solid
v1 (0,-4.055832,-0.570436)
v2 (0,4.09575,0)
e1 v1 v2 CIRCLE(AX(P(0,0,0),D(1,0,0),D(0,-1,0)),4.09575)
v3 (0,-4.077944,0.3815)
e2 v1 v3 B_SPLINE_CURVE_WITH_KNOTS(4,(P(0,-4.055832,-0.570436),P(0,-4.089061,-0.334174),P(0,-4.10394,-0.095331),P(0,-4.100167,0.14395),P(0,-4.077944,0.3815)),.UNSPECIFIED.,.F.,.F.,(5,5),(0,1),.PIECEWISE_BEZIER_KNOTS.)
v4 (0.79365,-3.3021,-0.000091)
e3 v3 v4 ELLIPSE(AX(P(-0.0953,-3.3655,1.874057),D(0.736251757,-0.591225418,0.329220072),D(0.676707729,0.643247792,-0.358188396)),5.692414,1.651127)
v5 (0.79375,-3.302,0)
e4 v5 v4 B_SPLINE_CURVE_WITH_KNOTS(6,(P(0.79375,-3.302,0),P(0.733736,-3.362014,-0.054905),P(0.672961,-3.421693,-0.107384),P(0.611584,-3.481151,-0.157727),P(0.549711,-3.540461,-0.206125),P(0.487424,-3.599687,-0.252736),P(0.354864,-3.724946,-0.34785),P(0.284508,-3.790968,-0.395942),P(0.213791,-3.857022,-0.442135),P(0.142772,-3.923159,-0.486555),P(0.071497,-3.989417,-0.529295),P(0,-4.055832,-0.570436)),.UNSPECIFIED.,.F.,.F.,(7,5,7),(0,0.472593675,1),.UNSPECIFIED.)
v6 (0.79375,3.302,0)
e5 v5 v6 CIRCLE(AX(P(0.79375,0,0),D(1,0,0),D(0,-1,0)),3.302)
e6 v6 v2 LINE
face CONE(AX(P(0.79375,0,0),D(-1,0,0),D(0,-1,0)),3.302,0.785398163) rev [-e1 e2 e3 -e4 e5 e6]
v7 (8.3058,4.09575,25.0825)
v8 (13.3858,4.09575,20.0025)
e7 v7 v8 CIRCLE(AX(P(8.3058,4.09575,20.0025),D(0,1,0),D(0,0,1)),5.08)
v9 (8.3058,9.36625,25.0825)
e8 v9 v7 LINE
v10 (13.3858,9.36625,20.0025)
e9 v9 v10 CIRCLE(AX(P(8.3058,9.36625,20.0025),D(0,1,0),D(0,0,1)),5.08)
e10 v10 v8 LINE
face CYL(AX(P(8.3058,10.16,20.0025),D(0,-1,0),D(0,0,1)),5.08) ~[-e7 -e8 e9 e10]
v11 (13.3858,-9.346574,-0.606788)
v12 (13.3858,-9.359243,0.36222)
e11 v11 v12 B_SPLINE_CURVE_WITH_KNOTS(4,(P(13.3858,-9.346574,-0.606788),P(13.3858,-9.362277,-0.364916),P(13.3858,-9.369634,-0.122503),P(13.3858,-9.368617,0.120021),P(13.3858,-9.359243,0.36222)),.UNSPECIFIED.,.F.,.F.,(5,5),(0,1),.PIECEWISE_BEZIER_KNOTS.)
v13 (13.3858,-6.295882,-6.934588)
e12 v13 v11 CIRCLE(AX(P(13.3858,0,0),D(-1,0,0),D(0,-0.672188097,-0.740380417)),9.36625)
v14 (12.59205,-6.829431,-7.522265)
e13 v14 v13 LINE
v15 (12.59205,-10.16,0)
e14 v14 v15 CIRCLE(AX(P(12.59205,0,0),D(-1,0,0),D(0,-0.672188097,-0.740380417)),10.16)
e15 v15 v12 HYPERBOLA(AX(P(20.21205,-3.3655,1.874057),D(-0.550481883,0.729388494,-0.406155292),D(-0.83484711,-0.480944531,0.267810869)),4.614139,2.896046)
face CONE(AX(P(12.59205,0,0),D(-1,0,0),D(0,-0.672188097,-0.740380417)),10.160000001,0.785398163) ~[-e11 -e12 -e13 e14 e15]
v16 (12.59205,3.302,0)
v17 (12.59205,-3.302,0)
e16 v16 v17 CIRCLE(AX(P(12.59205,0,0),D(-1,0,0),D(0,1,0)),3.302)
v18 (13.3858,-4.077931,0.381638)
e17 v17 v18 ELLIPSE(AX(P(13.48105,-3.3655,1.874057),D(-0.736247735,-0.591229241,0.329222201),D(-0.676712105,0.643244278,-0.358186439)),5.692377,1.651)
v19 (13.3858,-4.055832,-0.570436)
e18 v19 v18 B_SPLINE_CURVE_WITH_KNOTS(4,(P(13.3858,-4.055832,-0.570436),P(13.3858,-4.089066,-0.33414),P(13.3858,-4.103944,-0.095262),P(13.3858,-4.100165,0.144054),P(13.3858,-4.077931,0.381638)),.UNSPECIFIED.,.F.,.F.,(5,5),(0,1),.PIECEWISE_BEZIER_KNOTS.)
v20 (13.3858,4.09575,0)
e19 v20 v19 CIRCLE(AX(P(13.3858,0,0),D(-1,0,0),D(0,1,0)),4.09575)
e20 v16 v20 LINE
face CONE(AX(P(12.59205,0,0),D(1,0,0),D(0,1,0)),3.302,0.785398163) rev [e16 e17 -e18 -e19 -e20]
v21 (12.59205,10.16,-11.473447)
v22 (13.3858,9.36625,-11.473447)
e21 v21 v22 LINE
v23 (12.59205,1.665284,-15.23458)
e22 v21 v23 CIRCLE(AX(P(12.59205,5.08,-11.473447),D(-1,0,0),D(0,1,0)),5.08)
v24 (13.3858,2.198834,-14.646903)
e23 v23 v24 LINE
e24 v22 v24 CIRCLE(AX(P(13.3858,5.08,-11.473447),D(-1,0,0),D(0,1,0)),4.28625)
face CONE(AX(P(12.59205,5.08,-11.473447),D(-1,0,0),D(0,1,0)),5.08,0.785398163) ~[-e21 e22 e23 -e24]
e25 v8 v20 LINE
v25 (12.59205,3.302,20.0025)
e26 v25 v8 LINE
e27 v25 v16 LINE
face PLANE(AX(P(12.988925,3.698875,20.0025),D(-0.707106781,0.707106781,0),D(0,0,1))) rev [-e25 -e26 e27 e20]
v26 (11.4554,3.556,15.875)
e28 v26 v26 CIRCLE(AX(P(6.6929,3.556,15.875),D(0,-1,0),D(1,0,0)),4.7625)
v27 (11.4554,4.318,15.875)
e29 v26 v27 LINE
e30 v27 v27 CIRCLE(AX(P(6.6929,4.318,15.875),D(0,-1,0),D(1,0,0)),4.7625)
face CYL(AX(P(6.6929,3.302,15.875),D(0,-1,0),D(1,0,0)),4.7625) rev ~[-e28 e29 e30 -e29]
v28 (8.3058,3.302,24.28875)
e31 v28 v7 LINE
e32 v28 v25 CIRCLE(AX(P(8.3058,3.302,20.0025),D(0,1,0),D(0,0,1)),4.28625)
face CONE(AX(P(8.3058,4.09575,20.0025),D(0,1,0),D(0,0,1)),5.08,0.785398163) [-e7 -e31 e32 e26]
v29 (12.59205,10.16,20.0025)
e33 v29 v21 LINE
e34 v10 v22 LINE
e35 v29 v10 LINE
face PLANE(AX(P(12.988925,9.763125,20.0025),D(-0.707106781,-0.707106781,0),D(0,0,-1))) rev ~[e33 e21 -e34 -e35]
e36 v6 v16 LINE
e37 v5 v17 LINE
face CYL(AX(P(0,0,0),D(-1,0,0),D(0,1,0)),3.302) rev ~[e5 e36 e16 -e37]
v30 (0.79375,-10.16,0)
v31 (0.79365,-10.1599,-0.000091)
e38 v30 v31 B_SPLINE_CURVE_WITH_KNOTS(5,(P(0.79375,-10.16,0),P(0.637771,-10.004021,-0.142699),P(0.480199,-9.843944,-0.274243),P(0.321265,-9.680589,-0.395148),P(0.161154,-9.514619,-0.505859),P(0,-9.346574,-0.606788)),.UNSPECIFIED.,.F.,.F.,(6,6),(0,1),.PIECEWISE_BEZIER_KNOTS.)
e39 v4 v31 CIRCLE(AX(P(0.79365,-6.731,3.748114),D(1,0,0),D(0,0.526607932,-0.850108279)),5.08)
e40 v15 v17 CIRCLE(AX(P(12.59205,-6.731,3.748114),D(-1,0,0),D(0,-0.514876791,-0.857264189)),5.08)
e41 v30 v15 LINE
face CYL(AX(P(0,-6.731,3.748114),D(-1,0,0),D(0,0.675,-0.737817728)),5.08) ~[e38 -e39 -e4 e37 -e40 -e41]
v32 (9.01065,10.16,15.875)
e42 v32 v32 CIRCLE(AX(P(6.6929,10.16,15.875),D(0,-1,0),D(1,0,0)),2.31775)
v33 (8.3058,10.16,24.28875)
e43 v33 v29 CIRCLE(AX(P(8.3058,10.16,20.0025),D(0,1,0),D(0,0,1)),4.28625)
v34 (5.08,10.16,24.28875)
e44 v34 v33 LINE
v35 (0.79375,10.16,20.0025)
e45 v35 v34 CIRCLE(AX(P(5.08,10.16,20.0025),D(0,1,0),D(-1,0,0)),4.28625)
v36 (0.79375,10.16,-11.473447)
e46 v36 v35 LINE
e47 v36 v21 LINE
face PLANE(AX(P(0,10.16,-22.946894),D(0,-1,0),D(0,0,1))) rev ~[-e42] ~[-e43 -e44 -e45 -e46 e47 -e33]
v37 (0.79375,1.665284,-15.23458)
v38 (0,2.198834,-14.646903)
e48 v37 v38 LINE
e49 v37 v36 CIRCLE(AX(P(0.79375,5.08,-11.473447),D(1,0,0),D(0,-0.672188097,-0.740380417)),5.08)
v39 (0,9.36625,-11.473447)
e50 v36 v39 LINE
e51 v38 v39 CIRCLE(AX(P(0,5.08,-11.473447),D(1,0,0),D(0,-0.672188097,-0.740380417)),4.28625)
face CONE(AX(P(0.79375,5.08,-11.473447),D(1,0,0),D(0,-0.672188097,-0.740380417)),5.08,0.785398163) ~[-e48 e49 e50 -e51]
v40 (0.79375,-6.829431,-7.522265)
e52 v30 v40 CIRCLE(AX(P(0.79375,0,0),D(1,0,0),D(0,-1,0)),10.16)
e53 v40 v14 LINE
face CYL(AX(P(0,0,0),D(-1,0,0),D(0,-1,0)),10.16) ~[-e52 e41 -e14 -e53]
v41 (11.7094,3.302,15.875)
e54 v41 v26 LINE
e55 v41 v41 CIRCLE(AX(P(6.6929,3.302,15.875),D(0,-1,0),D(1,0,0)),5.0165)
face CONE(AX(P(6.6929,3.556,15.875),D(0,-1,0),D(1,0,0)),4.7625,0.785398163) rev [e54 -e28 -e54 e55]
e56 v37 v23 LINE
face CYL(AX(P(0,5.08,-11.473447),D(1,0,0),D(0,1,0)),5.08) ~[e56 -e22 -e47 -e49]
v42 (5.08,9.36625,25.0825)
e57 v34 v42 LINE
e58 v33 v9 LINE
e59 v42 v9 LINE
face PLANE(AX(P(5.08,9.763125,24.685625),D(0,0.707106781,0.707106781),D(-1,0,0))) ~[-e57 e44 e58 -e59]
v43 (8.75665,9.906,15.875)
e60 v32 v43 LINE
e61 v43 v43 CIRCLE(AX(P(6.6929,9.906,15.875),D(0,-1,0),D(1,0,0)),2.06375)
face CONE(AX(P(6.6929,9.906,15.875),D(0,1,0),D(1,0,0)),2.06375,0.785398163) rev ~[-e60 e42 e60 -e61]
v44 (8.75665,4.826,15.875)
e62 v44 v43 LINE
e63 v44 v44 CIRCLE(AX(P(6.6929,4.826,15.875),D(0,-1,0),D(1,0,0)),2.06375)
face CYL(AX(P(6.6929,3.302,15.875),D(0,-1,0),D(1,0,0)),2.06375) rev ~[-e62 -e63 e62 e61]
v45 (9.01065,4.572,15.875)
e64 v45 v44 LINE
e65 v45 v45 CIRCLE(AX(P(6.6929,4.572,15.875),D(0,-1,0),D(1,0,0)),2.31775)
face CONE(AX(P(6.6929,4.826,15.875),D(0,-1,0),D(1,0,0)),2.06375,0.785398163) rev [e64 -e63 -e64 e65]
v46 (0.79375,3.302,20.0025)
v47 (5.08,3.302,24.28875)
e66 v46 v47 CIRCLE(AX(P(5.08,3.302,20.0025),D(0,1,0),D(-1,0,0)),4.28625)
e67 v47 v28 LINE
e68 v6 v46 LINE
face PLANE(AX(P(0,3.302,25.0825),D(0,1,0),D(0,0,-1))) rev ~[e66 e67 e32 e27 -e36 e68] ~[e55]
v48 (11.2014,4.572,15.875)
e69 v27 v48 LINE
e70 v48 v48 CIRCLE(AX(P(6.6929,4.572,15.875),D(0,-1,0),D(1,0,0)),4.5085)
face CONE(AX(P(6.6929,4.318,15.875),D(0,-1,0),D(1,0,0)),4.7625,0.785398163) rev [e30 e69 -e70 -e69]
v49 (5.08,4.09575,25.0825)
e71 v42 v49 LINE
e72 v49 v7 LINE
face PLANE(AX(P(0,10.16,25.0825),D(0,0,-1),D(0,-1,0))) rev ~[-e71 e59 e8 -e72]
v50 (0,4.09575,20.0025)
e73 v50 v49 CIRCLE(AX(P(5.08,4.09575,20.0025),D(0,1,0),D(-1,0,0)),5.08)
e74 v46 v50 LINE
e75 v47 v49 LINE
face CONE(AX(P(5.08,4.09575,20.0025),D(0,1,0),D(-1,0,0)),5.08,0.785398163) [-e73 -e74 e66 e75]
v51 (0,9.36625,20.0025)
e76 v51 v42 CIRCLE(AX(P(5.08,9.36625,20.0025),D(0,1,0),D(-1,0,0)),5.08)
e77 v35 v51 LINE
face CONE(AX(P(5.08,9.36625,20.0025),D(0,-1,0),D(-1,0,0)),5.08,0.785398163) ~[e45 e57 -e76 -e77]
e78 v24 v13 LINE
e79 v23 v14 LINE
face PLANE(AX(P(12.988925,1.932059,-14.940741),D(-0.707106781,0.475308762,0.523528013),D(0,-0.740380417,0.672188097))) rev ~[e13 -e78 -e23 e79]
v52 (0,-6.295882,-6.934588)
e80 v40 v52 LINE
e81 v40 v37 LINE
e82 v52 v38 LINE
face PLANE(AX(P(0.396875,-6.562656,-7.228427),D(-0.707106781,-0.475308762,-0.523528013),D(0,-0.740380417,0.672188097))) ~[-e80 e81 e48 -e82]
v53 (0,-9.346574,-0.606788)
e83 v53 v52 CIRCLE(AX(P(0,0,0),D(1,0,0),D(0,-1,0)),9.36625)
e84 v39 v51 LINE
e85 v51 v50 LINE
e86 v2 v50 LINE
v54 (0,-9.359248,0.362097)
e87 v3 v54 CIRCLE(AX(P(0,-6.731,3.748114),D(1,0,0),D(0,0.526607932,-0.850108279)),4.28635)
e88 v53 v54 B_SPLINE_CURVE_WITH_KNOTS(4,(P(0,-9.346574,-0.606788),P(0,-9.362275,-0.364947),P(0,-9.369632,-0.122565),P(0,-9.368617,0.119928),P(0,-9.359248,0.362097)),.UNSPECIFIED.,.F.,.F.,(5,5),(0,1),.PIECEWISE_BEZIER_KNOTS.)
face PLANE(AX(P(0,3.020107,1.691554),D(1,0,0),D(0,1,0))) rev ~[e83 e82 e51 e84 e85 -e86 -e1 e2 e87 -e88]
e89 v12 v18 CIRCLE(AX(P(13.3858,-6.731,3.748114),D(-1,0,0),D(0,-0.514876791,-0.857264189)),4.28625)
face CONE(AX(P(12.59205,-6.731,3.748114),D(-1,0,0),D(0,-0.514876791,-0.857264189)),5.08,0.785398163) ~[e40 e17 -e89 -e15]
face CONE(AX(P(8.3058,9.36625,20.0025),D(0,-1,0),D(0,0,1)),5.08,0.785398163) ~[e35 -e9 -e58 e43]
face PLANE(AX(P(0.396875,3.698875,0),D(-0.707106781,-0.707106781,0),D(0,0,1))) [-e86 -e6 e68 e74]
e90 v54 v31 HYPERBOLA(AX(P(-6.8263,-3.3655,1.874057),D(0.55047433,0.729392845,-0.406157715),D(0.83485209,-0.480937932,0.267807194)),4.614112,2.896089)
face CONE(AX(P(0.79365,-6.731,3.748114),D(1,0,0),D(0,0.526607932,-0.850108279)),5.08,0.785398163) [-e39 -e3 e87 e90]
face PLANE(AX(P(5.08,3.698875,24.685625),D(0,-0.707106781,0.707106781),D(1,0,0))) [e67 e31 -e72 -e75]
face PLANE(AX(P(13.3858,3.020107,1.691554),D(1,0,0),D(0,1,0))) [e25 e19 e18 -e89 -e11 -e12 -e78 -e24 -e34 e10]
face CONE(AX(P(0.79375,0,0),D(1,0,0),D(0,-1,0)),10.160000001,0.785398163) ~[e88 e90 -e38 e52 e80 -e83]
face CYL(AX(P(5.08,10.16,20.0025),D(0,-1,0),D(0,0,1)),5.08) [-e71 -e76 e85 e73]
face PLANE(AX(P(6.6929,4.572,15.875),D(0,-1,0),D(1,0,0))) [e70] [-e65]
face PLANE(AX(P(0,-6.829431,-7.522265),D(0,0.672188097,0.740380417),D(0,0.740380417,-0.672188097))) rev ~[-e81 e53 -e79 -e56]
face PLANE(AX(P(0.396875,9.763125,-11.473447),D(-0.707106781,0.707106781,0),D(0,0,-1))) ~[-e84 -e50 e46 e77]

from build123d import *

# Parameters (mm, degrees)
F1_DEPTH   = 13.3858
F2_R       = 5.08
F3_R       = 2.06375
F4_DEPTH   = 25.4
F5_R       = 4.7625
F6_DEPTH   = 1.27
F7_C1_SIZE = 0.79375
F7_C2_SIZE = 0.79375
F7_C3_SIZE = 0.79365
F7_C4_SIZE = 0.79375
F8_SIZE    = 0.254


# Not quite as in the source:
# - a fillet or chamfer is up to 0.001 mm smaller than in the source, because OpenCascade refuses the exact size


with BuildPart() as f1:
    # F0 (on Right) → F1 (new body)
    with BuildSketch(Plane.YZ):
        with BuildLine():
            Line((10.16, -22.9468941689), (10.16, 25.0825))
            Line((10.16, 25.0825), (3.302, 25.0825))
            Line((3.302, 25.0825), (3.302, 0))
            ThreePointArc((3.302, 0), (0, -3.302), (-3.302, 0))
            ThreePointArc((-3.302, 0), (-6.731, 8.8281140591), (-10.16, 0))
            ThreePointArc((-10.16, 0), (-9.2901189355, -4.1133064758), (-6.8294310701, -7.5222650352))
            Line((-6.8294310701, -7.5222650352), (10.16, -22.9468941689))
        make_face()
    extrude(amount=F1_DEPTH)

    # F2
    f2_edges = [f1.edges().sort_by_distance(p)[0] for p in [
        (6.6929, 10.16, -22.946894),
        (13.3858, 6.731, 25.0825),
        (0, 6.731, 25.0825),
    ]]
    fillet(f2_edges, radius=F2_R)

    # F3 (on face) → F4 (cut)
    with BuildSketch(Plane.XZ.offset(-3.302)):
        with Locations((6.6929, 15.875)):
            Circle(F3_R)
    extrude(amount=-F4_DEPTH, mode=Mode.SUBTRACT)

    # F5 (on face) → F6 (cut)
    with BuildSketch(Plane.XZ.offset(-3.302)):
        with Locations((6.6929, 15.875)):
            Circle(F5_R)
    extrude(amount=-F6_DEPTH, mode=Mode.SUBTRACT)

    # F7: chamfer of 0.79375 on 16 edges, made by hand

    # F7_c1
    f7_c1_edges = [f1.edges().sort_by_distance(p)[0] for p in [
        (6.6929, 10.16, 25.0825),
        (1.4878975516, 10.16, 23.5946024484),
        (11.8979024484, 10.16, 23.5946024484),
        (0, 10.16, 4.2645264578),
        (13.3858, 10.16, 4.2645264578),
        (0, 7.1366532379, -16.1185065522),
        (0, -2.5820733026, -11.3784223186),
        (0, -9.2901189355, -4.1133064758),
        (13.3858, 7.1366532379, -16.1185065522),
        (13.3858, -2.5820733026, -11.3784223186),
        (13.3858, -9.2901189355, -4.1133064758),
    ]]
    chamfer(f7_c1_edges, length=F7_C1_SIZE)

    # F7_c2
    f7_c2_edges = [f1.edges().sort_by_distance(p)[0] for p in [
        (6.6929, 3.302, 25.0825),
        (1.4878975516, 3.302, 23.5946024484),
        (11.8979024484, 3.302, 23.5946024484),
        (0, 3.302, 10.00125),
        (0, 0, -3.302),
        (13.3858, 3.302, 10.00125),
        (13.3858, 0, -3.302),
    ]]
    chamfer(f7_c2_edges, length=F7_C2_SIZE)

    # F7_c3 (size 0.79375 in the source; OpenCascade refuses exactly that, so slightly less here)
    f7_c3_edges = [f1.edges().sort_by_distance(p)[0] for p in [
        (0, -6.731, 8.8281140591),
    ]]
    chamfer(f7_c3_edges, length=F7_C3_SIZE)

    # F7_c4
    f7_c4_edges = [f1.edges().sort_by_distance(p)[0] for p in [
        (13.3858, -6.731, 8.8281140591),
    ]]
    chamfer(f7_c4_edges, length=F7_C4_SIZE)

    # F8
    f8_edges = [f1.edges().sort_by_distance(p)[0] for p in [
        (11.4554, 3.937, 15.875),
        (1.9304, 3.302, 15.875),
        (1.9304, 4.572, 15.875),
        (4.62915, 4.572, 15.875),
        (8.75665, 7.366, 15.875),
        (4.62915, 10.16, 15.875),
    ]]
    chamfer(f8_edges, length=F8_SIZE)


solid = f1.part
